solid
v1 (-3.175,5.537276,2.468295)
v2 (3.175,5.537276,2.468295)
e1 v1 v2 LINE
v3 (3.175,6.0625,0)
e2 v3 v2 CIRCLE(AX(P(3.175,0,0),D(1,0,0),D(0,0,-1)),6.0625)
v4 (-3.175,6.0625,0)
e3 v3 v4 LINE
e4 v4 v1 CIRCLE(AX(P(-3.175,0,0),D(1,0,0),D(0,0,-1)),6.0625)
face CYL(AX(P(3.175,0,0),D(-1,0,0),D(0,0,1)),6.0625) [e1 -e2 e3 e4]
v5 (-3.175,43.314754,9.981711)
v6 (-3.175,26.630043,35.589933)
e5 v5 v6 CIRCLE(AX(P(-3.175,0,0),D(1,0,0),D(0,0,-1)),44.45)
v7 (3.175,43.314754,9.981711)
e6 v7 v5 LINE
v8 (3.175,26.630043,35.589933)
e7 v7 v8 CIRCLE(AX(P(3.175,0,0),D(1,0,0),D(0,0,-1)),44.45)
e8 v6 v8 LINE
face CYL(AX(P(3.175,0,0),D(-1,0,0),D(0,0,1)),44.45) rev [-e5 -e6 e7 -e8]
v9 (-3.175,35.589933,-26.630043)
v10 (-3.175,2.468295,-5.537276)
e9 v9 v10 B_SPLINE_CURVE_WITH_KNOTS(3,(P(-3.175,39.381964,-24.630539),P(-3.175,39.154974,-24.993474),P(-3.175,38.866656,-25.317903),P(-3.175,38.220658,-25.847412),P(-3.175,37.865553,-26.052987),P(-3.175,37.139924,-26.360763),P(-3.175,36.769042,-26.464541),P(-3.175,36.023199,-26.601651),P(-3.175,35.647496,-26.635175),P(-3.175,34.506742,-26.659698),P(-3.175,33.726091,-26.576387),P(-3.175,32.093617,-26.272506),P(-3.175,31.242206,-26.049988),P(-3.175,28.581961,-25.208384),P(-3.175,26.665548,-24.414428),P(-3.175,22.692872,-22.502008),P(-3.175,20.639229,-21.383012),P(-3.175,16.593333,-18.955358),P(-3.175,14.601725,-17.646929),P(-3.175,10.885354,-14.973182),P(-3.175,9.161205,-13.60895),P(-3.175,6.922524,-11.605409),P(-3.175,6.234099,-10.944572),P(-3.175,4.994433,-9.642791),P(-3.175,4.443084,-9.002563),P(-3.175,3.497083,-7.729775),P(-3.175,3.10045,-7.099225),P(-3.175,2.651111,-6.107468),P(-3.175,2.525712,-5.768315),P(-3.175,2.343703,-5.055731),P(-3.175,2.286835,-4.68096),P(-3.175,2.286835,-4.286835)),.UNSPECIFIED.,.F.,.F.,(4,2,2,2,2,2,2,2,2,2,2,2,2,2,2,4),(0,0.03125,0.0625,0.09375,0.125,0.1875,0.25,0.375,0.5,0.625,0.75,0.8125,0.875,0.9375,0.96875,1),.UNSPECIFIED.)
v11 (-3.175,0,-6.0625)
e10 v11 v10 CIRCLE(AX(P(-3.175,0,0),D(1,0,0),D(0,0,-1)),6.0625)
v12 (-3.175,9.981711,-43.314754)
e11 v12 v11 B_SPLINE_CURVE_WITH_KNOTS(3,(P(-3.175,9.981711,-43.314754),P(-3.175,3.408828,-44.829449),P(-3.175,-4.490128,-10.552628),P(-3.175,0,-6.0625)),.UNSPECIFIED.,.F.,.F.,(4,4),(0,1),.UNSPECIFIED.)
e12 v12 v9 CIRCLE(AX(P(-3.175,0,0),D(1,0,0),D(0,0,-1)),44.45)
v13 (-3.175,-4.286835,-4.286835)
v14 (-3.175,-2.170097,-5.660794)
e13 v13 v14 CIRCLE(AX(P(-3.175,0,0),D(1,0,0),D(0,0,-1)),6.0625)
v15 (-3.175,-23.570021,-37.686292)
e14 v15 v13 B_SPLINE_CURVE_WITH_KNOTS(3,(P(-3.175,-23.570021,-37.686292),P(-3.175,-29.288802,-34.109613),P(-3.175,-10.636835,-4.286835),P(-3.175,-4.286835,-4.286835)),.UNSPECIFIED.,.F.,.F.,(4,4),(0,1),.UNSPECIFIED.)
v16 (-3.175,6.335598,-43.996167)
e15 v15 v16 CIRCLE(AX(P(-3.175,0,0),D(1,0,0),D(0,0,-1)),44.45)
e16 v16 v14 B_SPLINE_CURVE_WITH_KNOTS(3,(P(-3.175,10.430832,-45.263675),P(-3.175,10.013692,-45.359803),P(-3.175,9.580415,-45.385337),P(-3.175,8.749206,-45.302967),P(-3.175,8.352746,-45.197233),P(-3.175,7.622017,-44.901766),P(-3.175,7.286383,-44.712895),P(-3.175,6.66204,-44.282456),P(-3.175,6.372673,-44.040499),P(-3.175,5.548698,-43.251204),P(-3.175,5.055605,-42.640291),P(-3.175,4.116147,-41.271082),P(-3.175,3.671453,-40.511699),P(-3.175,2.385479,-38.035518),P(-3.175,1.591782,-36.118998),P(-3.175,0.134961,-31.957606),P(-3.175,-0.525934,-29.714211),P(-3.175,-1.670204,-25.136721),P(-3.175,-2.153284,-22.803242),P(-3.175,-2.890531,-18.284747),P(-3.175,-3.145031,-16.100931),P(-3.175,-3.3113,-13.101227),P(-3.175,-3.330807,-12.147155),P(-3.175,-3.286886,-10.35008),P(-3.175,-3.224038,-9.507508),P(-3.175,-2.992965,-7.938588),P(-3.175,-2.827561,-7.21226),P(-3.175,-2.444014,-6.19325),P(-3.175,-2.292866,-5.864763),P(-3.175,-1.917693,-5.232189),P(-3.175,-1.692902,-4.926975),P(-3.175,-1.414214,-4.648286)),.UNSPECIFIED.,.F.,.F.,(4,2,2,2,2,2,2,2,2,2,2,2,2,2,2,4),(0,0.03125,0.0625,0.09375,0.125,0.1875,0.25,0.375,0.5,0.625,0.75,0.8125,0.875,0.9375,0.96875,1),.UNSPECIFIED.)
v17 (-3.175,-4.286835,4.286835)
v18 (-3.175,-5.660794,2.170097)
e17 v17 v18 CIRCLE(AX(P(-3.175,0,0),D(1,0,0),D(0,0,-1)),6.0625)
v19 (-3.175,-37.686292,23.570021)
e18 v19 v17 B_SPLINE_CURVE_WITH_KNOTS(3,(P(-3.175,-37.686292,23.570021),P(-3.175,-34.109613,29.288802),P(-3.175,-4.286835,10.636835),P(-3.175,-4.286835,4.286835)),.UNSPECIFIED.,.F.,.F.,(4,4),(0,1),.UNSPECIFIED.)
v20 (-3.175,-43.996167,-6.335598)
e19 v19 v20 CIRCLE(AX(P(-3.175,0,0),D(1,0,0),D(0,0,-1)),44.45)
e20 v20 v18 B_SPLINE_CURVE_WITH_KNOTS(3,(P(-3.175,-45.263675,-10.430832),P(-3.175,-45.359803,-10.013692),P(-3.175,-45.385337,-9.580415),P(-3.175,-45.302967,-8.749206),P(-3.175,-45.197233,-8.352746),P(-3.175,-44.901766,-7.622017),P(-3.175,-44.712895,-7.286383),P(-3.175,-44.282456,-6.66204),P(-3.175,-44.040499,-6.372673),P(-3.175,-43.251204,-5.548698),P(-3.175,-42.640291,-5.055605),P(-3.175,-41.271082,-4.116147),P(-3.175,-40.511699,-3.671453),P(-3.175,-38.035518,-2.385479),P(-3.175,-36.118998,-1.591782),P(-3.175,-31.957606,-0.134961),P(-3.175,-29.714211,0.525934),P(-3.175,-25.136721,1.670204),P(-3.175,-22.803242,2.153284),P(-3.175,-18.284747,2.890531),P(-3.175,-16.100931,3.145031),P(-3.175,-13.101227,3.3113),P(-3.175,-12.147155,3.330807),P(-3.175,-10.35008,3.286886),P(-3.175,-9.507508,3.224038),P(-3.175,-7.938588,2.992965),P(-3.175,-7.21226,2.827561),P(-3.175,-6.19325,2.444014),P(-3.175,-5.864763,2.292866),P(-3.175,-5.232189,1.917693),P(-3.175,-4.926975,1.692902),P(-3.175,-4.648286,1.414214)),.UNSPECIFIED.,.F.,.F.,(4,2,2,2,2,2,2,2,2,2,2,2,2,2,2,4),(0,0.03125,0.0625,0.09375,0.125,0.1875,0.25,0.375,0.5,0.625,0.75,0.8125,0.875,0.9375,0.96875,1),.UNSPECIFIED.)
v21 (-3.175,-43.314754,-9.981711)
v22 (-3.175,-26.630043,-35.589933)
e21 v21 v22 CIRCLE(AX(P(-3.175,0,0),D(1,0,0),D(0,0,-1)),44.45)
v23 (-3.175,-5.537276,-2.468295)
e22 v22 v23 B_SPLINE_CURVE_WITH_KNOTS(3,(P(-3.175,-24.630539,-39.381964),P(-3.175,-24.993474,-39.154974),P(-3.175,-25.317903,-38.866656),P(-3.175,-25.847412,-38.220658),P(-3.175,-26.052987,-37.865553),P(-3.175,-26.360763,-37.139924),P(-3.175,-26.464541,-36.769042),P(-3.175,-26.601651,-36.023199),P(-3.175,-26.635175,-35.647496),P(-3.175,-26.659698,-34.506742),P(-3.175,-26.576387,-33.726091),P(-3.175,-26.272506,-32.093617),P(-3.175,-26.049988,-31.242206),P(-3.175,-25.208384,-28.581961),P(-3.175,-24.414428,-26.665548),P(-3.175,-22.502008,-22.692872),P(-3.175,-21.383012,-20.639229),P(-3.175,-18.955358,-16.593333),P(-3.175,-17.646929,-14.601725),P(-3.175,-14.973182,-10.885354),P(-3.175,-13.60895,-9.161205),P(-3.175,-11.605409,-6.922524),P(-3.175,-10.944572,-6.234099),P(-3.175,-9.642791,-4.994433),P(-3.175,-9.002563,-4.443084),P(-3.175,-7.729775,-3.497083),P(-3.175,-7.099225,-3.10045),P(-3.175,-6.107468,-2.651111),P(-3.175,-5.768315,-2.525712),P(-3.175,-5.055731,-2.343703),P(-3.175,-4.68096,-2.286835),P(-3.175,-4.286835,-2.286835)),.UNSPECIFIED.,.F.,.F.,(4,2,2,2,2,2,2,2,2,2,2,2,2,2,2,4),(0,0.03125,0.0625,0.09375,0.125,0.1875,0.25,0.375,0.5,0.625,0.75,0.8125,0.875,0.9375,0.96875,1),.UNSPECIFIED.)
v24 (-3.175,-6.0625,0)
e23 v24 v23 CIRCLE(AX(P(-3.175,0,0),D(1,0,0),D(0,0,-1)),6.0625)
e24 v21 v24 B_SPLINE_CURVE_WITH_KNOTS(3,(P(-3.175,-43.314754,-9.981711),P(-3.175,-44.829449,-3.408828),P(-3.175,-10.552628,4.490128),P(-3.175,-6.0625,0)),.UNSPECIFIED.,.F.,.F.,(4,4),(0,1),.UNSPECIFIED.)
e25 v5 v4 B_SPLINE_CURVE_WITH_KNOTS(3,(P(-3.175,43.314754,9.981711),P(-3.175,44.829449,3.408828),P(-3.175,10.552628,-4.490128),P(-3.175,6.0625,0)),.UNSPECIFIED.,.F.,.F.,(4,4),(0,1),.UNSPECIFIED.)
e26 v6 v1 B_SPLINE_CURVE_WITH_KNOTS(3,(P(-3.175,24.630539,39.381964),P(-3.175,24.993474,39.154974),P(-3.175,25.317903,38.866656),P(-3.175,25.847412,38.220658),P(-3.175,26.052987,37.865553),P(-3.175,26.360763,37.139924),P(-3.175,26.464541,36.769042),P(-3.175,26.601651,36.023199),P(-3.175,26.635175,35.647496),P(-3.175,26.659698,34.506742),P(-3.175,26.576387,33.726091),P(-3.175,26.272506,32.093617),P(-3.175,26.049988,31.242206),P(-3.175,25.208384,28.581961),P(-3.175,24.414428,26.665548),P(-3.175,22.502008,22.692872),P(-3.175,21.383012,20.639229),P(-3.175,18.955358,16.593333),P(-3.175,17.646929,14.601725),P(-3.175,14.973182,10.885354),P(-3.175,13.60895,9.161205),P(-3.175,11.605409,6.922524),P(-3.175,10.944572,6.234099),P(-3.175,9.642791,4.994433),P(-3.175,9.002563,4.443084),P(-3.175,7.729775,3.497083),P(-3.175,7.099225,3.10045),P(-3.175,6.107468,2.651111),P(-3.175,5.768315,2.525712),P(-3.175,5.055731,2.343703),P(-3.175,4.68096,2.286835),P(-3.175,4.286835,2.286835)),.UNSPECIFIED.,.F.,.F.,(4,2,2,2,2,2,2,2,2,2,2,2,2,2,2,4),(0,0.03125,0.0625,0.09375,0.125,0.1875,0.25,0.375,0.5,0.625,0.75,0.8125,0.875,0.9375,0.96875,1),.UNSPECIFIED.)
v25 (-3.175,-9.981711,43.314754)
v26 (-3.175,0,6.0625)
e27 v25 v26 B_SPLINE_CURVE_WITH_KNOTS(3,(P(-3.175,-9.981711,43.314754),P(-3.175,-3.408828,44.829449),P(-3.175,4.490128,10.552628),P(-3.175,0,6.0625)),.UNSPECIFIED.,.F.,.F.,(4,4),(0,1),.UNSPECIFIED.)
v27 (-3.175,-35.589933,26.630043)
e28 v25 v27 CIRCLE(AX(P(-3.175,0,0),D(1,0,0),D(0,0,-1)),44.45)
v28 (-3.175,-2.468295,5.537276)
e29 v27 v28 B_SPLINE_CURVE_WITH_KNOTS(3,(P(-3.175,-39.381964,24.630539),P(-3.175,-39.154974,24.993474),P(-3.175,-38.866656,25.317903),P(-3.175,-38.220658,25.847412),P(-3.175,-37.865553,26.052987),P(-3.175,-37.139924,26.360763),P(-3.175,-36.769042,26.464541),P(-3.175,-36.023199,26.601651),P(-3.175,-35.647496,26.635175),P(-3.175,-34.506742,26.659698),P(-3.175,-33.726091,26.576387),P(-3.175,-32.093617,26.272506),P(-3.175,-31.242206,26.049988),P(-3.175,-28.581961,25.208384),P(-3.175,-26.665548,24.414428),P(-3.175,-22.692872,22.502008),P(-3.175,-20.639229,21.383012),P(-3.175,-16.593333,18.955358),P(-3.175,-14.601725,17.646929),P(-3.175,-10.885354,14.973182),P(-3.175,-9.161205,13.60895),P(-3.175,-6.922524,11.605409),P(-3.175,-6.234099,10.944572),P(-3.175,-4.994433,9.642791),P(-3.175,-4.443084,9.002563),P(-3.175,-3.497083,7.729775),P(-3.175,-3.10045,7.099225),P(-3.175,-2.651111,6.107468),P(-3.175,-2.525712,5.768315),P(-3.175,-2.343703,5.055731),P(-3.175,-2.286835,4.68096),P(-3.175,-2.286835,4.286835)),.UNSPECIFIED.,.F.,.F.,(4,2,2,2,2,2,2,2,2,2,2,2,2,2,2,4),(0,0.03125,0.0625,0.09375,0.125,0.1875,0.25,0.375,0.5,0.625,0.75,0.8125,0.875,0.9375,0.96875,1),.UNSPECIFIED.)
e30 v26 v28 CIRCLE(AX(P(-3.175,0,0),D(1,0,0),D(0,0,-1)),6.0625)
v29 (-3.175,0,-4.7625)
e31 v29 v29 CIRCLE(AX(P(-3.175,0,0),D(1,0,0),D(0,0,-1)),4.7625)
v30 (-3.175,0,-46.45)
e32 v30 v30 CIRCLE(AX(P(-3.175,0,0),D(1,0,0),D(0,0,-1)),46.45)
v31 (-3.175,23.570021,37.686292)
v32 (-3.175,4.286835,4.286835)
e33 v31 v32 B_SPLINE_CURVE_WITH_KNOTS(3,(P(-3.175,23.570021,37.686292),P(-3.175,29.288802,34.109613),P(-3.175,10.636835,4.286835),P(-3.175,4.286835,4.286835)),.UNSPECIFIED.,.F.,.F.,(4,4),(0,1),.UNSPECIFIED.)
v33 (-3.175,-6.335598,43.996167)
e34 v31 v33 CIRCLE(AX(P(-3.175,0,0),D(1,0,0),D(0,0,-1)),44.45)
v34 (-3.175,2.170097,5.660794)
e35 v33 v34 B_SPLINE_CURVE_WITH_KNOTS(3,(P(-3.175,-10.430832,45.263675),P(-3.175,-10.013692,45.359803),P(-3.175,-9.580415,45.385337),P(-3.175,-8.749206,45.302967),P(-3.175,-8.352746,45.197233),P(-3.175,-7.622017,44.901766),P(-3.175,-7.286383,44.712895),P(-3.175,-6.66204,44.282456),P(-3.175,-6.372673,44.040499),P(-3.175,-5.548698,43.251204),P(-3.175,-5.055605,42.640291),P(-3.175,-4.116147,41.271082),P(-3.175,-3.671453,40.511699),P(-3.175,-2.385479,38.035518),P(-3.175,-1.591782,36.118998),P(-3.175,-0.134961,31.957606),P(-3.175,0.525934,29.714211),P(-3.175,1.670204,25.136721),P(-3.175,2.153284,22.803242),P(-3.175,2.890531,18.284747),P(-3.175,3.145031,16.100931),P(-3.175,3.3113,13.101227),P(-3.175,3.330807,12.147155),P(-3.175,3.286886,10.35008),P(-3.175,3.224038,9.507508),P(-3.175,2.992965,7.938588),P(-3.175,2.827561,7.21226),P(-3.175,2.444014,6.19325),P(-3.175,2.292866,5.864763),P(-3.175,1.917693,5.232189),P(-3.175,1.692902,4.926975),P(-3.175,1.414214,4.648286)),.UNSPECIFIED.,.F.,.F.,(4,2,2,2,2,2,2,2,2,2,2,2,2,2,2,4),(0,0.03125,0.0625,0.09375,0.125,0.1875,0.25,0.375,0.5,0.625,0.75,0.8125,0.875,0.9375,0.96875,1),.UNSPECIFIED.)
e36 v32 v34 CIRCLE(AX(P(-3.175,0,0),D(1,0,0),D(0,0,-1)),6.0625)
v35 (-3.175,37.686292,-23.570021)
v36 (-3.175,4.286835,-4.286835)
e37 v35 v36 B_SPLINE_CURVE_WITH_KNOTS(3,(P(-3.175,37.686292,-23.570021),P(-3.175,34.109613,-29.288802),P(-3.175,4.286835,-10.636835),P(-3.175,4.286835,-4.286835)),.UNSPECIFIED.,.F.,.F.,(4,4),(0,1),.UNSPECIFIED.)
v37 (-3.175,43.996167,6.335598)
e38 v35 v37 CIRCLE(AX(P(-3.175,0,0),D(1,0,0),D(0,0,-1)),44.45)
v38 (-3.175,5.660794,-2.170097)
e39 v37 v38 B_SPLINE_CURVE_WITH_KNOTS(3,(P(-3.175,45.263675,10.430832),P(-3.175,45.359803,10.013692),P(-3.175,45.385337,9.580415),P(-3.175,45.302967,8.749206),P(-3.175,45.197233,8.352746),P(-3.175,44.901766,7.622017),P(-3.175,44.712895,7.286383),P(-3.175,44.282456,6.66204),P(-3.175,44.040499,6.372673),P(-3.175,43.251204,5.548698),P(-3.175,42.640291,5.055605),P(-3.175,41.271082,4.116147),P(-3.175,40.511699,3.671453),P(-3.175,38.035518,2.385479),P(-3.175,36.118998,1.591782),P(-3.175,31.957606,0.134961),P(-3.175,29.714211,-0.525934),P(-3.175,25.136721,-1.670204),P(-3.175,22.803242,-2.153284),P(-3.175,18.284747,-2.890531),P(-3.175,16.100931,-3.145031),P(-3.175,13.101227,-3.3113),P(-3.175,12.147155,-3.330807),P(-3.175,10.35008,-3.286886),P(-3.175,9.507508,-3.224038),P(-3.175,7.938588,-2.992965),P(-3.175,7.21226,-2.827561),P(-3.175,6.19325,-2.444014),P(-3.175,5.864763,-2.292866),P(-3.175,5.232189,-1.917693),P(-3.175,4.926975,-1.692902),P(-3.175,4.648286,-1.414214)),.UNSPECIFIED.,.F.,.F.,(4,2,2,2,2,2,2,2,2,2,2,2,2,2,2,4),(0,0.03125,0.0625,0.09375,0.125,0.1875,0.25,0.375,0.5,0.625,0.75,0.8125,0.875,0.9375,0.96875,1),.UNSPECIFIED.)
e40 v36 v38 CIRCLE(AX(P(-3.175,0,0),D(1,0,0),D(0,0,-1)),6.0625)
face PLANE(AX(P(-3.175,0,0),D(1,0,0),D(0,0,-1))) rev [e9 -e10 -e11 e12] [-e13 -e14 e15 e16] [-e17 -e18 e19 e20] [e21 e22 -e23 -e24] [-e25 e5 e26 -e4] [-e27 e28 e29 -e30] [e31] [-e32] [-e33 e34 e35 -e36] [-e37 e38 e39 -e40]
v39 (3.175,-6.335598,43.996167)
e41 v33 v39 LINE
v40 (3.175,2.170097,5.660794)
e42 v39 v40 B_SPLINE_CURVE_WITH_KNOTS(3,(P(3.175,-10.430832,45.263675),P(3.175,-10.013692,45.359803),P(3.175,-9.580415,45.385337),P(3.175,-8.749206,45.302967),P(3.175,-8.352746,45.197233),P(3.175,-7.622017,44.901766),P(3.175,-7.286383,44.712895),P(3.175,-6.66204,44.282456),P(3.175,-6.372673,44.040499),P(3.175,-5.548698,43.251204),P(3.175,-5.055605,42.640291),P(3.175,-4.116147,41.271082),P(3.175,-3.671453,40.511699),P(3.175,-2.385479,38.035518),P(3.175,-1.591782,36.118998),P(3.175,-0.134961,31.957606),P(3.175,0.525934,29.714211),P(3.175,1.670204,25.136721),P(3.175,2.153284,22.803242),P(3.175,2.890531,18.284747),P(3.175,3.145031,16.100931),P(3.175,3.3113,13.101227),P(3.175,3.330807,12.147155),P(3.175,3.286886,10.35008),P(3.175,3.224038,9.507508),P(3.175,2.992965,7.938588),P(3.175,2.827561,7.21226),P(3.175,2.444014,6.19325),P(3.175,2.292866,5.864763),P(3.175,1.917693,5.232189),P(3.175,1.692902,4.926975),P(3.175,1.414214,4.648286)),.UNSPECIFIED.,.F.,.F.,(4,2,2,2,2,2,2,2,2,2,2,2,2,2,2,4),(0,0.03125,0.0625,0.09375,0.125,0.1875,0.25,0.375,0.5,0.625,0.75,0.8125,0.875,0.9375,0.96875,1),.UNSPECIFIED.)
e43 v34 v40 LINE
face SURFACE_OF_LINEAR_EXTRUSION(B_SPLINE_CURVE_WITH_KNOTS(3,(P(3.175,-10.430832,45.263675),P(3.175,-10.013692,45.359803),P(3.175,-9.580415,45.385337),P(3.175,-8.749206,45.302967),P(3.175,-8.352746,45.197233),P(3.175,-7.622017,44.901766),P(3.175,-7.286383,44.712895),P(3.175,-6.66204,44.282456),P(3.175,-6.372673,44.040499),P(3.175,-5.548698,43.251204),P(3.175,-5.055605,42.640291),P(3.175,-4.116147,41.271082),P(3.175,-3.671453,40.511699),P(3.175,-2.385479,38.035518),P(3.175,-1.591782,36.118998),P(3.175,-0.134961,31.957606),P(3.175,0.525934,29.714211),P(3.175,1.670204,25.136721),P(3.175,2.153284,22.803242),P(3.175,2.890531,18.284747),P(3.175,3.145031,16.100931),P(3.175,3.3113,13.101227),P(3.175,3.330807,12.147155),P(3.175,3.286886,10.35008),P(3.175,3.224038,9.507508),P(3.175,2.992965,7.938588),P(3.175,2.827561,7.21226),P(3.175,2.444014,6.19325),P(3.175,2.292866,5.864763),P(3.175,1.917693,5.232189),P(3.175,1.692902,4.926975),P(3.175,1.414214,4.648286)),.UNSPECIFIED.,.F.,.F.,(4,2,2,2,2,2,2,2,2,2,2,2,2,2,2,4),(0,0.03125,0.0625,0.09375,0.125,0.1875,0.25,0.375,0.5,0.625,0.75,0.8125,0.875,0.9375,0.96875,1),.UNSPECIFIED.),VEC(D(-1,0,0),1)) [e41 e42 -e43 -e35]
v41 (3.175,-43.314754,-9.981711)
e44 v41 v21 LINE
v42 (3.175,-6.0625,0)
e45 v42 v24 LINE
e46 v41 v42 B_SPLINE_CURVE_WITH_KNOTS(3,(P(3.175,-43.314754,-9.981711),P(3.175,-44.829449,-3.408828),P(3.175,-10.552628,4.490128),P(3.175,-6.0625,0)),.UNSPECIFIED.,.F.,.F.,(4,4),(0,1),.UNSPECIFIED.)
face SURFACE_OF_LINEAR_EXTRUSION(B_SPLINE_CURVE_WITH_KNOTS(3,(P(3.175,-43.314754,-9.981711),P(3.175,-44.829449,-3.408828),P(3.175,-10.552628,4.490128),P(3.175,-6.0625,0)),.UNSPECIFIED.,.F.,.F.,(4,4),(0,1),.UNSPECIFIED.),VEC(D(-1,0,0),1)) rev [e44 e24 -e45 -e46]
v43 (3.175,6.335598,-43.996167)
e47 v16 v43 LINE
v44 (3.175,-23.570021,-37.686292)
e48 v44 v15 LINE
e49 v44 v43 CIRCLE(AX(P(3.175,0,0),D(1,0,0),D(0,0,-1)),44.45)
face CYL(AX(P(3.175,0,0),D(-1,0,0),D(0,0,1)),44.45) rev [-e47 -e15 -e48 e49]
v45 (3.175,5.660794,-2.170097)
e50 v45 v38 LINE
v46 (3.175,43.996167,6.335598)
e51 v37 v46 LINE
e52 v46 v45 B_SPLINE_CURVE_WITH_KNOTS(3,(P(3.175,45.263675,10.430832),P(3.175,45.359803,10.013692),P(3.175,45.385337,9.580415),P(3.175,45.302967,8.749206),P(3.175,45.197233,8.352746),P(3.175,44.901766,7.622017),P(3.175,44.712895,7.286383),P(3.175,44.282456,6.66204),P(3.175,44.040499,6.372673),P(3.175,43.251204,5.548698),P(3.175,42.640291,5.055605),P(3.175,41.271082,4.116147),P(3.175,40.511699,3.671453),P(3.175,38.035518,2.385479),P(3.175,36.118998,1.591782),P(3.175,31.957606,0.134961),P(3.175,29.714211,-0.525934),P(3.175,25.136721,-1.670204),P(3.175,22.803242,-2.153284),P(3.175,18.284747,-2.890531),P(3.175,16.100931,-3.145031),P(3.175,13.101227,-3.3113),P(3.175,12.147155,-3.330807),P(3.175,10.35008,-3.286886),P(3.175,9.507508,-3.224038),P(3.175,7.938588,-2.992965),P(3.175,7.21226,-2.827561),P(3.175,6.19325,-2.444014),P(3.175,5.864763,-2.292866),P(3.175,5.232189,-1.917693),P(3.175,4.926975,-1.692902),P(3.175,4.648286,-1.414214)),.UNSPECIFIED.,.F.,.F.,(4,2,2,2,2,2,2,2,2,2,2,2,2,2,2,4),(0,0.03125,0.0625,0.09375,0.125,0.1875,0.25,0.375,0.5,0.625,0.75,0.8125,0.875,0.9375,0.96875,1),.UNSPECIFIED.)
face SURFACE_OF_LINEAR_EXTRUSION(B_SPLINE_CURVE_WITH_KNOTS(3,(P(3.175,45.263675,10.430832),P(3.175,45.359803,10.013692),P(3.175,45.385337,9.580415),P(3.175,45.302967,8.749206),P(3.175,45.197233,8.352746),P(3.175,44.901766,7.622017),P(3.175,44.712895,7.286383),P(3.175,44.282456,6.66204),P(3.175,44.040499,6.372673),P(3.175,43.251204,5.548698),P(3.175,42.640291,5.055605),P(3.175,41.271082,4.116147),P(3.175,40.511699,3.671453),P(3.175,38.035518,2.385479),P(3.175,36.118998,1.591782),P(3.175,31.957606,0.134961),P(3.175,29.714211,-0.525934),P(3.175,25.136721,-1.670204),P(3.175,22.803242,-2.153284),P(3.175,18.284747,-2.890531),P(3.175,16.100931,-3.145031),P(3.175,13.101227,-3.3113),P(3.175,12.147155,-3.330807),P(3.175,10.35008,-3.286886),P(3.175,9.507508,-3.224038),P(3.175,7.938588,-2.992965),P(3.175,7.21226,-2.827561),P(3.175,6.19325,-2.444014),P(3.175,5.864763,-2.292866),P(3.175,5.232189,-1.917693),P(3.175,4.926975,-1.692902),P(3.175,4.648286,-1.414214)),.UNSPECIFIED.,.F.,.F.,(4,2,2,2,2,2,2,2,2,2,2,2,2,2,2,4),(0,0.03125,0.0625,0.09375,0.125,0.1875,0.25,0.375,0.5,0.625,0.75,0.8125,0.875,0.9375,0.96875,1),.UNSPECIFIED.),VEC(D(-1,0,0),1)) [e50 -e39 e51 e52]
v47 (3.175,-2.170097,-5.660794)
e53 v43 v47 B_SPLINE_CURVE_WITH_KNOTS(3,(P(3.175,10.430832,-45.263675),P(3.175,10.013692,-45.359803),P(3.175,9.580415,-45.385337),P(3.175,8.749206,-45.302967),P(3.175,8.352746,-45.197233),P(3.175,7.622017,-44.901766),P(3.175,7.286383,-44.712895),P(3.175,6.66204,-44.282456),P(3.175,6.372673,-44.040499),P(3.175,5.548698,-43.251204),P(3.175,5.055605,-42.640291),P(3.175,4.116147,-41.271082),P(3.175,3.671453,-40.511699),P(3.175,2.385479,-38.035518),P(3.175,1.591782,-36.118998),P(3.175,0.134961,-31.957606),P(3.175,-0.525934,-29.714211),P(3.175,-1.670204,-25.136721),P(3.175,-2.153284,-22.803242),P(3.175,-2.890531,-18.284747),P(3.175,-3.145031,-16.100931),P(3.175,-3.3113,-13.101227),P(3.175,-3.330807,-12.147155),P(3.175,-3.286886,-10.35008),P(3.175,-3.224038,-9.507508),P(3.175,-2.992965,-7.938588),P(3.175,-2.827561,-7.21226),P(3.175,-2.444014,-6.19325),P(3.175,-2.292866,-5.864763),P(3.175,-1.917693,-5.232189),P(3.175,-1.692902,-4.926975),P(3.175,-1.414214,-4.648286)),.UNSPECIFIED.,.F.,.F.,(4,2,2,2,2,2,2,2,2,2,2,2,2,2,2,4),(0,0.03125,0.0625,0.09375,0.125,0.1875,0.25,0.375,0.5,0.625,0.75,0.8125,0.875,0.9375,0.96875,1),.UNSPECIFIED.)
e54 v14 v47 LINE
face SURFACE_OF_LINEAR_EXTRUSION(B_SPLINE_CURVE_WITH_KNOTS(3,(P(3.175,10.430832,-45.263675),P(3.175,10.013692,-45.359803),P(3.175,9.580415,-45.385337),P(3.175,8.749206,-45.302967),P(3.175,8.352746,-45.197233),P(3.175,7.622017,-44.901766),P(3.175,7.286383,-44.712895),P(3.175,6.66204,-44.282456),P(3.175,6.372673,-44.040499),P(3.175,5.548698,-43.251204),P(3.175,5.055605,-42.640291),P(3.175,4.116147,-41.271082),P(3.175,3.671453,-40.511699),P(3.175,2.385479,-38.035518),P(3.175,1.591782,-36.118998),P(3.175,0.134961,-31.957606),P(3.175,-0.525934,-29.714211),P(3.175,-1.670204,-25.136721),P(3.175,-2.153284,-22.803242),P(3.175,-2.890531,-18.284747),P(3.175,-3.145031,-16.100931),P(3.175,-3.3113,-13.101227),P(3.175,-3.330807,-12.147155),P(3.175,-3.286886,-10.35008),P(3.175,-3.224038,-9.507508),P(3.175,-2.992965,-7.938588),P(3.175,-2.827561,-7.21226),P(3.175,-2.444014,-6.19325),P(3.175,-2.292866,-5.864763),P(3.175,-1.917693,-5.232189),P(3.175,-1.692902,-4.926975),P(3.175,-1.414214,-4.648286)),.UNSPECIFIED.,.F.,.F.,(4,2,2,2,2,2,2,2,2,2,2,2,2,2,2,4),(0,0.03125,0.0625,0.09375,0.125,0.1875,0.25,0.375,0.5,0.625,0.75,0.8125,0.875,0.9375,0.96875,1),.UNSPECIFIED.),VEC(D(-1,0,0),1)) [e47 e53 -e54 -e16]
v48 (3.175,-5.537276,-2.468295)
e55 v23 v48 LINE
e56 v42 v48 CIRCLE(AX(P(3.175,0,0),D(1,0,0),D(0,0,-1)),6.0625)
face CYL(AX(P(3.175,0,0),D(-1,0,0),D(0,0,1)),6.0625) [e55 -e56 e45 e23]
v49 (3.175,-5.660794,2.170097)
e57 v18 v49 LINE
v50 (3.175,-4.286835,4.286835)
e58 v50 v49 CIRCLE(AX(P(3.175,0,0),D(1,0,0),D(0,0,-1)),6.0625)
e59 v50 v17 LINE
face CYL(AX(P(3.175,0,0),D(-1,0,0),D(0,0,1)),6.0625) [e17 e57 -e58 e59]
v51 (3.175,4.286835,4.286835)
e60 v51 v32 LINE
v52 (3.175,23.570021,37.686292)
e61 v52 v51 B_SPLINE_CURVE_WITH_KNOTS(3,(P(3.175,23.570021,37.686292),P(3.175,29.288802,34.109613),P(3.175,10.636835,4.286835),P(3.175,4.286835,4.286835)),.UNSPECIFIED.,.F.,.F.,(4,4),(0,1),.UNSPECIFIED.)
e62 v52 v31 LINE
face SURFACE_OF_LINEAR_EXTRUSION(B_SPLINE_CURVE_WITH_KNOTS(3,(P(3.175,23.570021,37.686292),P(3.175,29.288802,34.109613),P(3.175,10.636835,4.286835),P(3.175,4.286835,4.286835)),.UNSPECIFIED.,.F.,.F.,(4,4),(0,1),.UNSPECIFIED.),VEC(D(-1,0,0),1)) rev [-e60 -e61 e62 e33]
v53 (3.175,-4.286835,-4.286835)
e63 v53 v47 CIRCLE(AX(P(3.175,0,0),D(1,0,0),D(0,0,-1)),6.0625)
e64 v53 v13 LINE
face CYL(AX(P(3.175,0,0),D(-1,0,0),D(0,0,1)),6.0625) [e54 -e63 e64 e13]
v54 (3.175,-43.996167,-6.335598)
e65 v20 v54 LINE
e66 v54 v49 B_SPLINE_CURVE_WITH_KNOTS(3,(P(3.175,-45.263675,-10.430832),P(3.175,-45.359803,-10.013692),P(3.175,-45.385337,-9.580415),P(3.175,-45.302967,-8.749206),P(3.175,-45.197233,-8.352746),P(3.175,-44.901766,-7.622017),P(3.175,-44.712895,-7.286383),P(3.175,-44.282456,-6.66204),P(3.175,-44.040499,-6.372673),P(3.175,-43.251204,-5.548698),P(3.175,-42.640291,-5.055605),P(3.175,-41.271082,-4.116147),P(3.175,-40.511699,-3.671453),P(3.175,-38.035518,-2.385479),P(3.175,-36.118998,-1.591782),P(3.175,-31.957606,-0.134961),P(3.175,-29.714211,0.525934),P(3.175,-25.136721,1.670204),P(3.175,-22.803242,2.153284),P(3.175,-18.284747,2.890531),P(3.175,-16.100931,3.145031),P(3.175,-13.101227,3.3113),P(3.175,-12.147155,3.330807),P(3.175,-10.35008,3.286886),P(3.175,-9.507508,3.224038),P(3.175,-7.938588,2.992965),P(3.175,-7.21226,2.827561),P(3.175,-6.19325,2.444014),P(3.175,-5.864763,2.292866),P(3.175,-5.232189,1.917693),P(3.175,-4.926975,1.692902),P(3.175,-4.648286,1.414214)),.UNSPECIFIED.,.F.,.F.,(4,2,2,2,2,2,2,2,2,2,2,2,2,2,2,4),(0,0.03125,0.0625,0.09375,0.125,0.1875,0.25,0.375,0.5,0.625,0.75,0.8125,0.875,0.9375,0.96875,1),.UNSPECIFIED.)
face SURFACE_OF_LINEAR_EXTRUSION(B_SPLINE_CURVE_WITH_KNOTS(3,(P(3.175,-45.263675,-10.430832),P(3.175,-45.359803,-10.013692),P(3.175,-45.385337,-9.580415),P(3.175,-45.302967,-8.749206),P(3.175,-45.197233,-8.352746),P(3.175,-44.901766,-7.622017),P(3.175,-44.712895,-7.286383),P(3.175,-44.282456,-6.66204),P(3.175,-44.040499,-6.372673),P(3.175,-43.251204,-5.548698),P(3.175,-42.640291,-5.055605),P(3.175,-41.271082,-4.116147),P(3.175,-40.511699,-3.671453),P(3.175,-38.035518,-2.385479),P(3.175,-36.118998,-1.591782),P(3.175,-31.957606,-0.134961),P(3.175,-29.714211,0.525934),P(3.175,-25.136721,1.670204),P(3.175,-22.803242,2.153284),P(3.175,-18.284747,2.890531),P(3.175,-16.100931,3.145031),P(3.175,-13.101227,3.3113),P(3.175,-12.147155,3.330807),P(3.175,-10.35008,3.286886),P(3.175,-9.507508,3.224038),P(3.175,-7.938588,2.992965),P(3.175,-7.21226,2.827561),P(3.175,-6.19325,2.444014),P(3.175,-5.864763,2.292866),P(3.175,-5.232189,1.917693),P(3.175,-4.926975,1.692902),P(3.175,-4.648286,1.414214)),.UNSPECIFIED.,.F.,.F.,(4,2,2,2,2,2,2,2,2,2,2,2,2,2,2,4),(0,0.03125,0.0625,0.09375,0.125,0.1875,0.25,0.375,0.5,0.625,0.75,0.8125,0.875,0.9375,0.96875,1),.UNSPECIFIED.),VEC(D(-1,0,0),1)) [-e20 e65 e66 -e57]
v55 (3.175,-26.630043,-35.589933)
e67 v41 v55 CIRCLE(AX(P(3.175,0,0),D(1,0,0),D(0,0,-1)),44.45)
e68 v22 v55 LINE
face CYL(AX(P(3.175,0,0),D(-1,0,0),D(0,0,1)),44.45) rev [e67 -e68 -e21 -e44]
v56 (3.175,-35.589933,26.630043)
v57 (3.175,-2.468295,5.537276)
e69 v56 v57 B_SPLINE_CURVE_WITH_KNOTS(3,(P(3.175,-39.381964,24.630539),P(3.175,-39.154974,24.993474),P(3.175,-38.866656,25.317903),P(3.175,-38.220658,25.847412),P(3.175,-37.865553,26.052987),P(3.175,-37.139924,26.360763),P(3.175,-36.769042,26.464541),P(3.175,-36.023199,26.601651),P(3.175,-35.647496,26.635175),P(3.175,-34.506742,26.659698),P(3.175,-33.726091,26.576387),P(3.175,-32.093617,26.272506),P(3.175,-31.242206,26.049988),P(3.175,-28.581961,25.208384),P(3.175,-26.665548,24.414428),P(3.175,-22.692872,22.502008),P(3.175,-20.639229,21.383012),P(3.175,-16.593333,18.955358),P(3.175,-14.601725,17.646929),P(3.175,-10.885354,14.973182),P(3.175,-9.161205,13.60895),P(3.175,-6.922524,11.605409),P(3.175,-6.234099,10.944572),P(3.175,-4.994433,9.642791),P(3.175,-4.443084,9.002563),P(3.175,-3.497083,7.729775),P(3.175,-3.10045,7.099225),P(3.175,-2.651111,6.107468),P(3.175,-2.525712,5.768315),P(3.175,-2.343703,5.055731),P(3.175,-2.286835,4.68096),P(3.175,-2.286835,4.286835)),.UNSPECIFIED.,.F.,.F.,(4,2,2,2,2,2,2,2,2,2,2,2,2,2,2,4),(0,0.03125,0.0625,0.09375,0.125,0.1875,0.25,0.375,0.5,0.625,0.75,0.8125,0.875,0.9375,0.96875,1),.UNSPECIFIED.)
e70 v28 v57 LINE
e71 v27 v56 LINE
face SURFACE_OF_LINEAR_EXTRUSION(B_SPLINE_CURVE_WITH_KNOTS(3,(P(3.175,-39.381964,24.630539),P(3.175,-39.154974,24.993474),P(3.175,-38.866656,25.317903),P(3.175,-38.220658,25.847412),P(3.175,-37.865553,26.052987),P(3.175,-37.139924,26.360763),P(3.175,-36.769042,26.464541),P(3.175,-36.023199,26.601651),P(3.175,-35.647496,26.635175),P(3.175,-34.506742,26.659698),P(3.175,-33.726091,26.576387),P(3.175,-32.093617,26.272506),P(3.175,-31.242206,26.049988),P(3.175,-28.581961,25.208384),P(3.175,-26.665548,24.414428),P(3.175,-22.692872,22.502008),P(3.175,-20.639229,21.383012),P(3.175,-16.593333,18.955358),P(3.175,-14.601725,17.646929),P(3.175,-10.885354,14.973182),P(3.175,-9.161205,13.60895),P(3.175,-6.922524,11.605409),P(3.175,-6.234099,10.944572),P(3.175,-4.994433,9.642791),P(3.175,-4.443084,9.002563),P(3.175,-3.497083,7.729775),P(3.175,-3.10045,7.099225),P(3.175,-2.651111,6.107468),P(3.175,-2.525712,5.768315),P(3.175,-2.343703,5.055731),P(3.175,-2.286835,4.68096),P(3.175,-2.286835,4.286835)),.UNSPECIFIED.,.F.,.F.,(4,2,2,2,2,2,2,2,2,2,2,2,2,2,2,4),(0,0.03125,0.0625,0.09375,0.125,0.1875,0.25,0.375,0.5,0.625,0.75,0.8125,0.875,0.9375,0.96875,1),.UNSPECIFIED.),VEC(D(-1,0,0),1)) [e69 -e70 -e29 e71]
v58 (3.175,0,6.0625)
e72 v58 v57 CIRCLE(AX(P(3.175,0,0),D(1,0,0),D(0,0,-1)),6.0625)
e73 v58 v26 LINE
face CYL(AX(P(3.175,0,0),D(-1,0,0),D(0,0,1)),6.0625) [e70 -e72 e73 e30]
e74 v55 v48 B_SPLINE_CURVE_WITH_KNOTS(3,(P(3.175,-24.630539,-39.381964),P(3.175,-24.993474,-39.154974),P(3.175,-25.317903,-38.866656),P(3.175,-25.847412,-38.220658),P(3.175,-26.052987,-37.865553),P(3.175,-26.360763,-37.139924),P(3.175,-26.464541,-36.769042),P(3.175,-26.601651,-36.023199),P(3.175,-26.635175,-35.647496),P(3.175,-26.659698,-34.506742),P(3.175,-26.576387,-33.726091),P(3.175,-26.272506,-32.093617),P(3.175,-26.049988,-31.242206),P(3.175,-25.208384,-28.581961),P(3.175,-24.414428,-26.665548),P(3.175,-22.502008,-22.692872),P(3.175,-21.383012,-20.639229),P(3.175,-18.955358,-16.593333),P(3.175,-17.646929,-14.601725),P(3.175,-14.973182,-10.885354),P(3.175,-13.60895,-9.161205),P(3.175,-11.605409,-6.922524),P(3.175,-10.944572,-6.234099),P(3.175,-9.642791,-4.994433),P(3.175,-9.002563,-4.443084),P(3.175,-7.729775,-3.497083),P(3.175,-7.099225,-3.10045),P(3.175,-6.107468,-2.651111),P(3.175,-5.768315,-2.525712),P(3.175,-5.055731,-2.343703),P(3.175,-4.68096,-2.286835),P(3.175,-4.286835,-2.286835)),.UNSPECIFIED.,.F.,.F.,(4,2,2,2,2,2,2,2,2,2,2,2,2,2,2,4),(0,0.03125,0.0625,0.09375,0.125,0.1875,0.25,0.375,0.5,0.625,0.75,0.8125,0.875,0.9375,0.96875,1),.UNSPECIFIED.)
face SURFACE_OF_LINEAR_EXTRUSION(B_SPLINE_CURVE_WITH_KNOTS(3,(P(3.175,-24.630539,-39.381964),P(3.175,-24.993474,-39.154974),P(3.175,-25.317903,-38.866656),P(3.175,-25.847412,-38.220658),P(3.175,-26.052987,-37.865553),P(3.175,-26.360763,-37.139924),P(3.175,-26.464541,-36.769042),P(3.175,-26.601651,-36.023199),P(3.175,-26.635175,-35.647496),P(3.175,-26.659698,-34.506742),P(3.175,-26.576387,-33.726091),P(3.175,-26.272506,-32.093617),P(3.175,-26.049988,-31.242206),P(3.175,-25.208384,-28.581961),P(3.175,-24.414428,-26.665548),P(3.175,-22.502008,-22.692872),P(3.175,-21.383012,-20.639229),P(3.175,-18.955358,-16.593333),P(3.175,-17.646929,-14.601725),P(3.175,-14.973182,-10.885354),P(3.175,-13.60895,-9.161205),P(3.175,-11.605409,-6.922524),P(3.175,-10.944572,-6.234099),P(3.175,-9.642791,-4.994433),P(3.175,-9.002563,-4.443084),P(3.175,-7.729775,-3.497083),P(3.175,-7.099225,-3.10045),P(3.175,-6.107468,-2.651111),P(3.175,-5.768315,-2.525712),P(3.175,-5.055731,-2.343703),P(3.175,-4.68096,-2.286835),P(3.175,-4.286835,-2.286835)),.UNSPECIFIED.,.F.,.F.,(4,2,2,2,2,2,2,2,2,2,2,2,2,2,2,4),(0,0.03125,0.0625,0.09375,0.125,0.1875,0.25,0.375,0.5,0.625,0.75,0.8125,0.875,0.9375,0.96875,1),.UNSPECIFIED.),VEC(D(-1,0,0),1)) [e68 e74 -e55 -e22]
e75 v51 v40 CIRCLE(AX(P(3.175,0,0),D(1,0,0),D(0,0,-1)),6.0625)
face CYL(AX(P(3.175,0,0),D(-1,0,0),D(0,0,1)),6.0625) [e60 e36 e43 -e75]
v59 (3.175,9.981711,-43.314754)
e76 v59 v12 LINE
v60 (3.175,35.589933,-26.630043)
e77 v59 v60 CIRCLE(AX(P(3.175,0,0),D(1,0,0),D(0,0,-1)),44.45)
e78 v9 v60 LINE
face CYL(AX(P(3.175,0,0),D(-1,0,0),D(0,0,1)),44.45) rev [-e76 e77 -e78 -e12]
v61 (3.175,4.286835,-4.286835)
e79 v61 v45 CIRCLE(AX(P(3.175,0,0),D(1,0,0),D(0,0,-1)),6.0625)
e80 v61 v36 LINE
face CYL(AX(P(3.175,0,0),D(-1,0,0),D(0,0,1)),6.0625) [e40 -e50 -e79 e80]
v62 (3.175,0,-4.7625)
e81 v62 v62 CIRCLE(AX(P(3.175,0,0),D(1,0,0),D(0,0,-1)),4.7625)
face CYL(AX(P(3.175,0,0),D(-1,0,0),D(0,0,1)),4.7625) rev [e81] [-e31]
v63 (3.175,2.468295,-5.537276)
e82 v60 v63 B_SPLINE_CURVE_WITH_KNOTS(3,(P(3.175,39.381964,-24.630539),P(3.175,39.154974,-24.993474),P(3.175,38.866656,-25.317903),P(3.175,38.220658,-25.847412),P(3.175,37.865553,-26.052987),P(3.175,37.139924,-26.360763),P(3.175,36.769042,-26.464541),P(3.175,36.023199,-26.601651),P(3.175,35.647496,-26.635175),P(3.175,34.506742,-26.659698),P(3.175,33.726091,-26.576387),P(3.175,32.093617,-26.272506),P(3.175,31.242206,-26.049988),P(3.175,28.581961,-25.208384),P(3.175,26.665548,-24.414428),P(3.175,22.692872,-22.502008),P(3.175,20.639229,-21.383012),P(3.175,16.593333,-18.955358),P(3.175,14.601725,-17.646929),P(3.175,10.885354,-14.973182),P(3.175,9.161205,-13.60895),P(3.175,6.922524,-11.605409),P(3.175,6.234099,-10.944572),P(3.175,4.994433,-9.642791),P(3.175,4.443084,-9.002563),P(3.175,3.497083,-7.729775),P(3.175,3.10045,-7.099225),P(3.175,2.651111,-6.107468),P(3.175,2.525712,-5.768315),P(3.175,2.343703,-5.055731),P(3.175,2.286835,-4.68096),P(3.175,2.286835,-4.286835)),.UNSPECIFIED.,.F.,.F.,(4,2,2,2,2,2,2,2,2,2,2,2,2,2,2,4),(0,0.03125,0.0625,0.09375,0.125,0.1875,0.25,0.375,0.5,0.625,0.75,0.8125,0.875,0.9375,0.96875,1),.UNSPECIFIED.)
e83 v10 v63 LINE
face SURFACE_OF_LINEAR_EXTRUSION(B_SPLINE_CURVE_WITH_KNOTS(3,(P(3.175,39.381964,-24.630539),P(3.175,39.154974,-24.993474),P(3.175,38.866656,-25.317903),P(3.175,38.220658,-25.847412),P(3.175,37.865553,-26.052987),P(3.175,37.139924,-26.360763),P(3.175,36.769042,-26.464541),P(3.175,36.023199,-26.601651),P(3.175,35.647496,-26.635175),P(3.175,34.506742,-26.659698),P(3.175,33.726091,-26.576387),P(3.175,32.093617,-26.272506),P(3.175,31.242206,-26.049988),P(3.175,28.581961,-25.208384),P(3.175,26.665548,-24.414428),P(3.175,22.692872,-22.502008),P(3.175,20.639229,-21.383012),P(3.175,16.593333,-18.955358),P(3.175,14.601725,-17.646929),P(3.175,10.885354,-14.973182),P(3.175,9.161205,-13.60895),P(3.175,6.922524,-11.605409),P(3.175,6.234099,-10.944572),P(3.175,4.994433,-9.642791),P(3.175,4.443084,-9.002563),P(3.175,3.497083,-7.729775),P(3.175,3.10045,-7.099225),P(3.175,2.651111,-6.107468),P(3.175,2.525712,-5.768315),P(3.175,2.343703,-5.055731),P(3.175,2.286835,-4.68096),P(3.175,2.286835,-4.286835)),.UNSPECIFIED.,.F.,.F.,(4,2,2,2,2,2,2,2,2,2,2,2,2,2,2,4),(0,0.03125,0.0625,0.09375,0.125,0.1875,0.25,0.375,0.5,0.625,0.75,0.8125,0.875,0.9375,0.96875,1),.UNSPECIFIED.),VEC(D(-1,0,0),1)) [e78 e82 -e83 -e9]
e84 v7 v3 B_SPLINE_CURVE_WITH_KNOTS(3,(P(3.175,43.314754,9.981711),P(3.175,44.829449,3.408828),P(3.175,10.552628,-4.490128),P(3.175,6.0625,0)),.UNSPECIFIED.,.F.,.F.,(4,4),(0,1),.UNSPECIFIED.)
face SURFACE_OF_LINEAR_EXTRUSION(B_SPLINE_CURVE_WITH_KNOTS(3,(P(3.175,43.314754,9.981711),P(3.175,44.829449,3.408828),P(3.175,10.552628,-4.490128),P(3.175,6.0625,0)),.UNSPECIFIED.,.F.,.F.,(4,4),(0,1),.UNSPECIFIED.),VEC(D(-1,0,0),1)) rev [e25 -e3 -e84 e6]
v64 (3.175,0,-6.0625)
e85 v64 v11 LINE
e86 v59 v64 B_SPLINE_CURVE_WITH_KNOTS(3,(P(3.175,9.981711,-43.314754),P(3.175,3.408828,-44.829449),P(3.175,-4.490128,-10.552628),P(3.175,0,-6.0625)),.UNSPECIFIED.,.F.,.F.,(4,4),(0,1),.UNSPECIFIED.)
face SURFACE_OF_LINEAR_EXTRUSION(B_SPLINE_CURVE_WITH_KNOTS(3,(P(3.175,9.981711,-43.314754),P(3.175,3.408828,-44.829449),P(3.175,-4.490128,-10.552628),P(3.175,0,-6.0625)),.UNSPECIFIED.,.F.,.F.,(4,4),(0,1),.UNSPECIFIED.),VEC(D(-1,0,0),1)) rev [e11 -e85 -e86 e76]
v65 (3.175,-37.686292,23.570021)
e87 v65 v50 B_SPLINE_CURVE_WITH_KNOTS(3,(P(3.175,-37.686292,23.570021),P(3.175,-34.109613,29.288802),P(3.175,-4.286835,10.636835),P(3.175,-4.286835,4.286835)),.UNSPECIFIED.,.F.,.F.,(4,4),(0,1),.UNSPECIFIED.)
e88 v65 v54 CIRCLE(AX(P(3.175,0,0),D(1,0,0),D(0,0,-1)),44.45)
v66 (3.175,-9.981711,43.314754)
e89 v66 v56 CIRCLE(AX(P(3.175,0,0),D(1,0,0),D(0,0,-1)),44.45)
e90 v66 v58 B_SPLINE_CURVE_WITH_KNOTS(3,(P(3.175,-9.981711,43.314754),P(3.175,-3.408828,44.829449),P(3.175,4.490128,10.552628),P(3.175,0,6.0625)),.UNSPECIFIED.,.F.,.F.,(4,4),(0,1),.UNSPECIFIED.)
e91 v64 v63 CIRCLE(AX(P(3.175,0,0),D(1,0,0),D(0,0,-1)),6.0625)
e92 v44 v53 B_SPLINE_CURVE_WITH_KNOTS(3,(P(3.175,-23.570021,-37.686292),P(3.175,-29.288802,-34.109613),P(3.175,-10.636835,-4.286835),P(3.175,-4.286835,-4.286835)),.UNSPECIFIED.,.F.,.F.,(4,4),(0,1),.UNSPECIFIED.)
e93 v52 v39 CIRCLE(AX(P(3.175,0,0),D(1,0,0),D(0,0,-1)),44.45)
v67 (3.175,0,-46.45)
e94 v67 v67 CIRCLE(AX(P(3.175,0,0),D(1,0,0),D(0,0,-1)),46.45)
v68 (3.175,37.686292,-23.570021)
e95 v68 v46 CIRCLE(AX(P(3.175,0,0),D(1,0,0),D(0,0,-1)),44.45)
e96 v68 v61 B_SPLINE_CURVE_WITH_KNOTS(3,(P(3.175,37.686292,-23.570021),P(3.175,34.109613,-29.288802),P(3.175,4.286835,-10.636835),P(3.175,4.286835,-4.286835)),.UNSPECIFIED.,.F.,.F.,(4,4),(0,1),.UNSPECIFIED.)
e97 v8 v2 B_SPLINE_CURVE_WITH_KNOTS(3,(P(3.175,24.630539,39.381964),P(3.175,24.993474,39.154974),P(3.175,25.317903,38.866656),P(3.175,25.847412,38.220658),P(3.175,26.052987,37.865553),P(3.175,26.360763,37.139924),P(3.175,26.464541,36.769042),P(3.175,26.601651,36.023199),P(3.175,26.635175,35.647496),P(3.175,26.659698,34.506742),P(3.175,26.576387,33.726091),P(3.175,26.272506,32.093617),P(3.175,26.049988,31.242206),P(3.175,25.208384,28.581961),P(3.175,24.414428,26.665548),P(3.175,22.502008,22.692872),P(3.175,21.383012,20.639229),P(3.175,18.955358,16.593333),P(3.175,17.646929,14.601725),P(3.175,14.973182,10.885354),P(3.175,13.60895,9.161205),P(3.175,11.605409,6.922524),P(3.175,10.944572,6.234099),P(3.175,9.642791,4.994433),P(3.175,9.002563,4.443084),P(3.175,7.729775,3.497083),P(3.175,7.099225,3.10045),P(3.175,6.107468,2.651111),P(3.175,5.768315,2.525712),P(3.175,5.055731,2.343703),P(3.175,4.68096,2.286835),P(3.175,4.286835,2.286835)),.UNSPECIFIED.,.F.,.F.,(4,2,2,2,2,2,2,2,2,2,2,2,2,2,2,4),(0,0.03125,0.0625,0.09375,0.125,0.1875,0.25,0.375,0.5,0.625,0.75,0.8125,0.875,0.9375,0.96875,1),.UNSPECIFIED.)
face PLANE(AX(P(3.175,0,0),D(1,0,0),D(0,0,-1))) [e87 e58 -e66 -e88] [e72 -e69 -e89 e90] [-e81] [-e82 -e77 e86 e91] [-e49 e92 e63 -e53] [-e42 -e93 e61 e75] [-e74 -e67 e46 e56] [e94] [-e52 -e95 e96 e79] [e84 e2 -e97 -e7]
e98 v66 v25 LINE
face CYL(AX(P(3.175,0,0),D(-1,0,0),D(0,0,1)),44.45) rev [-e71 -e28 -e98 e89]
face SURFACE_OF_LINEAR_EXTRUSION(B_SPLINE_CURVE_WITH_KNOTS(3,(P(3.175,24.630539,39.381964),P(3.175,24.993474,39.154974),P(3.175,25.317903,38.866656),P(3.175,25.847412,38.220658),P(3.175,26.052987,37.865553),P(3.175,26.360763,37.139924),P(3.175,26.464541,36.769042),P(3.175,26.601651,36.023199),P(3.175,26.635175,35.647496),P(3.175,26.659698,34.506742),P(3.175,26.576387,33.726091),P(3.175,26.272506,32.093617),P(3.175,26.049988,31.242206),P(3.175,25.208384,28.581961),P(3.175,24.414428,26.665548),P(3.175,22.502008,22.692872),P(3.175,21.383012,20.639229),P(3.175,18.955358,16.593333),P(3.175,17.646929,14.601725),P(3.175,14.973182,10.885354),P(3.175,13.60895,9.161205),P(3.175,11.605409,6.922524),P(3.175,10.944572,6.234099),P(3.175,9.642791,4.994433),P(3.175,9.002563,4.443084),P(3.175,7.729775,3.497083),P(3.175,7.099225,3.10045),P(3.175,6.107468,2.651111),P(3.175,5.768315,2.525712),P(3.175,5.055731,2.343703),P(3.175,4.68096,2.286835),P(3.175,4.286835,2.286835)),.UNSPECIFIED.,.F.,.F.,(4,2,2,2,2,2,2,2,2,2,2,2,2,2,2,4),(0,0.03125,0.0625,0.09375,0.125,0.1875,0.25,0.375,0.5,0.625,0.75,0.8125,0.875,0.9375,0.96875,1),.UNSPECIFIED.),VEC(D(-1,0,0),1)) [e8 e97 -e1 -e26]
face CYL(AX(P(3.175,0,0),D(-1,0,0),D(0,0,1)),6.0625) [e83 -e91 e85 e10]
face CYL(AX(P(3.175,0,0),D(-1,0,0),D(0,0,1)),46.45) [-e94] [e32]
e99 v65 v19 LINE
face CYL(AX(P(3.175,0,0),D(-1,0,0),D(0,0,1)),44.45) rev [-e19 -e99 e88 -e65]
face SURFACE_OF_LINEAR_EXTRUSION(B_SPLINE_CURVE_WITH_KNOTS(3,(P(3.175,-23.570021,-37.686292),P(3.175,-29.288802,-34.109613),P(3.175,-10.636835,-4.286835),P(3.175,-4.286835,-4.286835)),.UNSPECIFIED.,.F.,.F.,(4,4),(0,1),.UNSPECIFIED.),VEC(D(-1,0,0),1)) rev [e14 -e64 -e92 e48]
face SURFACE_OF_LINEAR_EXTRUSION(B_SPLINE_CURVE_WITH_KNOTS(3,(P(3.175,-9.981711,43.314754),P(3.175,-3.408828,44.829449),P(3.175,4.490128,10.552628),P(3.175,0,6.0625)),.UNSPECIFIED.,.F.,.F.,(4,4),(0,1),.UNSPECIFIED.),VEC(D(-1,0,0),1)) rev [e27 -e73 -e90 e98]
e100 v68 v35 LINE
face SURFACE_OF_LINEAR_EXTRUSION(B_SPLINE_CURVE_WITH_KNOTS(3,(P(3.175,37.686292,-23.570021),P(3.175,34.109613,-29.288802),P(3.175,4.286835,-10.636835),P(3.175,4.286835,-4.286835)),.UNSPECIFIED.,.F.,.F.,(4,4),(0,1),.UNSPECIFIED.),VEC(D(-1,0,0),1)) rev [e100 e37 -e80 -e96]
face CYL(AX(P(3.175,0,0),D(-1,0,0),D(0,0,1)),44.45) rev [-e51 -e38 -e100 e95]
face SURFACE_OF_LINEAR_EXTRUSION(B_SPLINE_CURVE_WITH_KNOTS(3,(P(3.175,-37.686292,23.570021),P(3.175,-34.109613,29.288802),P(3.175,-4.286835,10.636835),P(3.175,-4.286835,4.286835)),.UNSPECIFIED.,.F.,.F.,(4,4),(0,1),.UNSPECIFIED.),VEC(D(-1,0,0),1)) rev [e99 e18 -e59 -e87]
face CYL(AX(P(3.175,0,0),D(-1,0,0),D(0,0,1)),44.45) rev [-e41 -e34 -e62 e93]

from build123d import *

# Parameters (mm, degrees)
SKETCH1_R             = 6.0625
SKETCH1_R_2           = 4.7625
BOSS_EXTRUDE1_DEPTH   = 3.175
SKETCH1_R_3           = 46.45
SKETCH1_R_4           = 44.45
BOSS_EXTRUDE1_2_DEPTH = 3.175
EXTRUDE_THIN2_START   = -3.175
EXTRUDE_THIN2_DEPTH   = 6.35
CIRPATTERN1_COUNT     = 8


# Read off the part's stored shape, not the designer's step: Extrude-Thin2
with BuildPart() as part:
    # Sketch1 → Boss-Extrude1 (new, symmetric)
    with BuildSketch(Plane(origin=(0, 0, 0), x_dir=(0, 0, -1), z_dir=(1, 0, 0))):
        Circle(SKETCH1_R)
        Circle(SKETCH1_R_2, mode=Mode.SUBTRACT)
    extrude(amount=BOSS_EXTRUDE1_DEPTH, both=True)



with BuildPart() as body_2:
    # Sketch1 → Boss-Extrude1 2 (new, symmetric)
    with BuildSketch(Plane(origin=(0, 0, 0), x_dir=(0, 0, -1), z_dir=(1, 0, 0))):
        Circle(SKETCH1_R_3)
        Circle(SKETCH1_R_4, mode=Mode.SUBTRACT)
    extrude(amount=BOSS_EXTRUDE1_2_DEPTH, both=True)


with BuildPart() as part_1:
    add(part.part)

    add(body_2.part)  # Extrude-Thin2 merges body 2
    # Extrude-Thin2 outline → Extrude-Thin2 (add)
    with BuildSketch(Plane(origin=(0, 0, 0), x_dir=(0, 0, -1), z_dir=(1, 0, 0)).offset(EXTRUDE_THIN2_START)):
        with BuildLine():
            add(Edge.make_bspline(
                [(-6.3355985, 43.996166784), (-6.255095923, 43.925032839), (-6.175963075, 43.852068198), (-5.548698351, 43.251204224), (-5.055604829, 42.640291134), (-4.116147204, 41.27108179), (-3.6714525, 40.51169877), (-2.385479272, 38.035518018), (-1.591781782, 36.118997617), (-0.134960901, 31.957605755), (0.525933851, 29.714211022), (1.670203871, 25.136721013), (2.153284246, 22.803242272), (2.890531028, 18.2847466), (3.145030649, 16.100931227), (3.311299949, 13.10122741), (3.330807031, 12.147155076), (3.286885537, 10.350080052), (3.224038366, 9.507507634), (2.992965499, 7.938587571), (2.827561189, 7.21225965), (2.459079192, 6.233276095), (2.328164202, 5.942334081), (2.170097204, 5.660793617)],
                knots=[0.116131233, 0.116131233, 0.116131233, 0.116131233, 0.125, 0.125, 0.1875, 0.1875, 0.25, 0.25, 0.375, 0.375, 0.5, 0.5, 0.625, 0.625, 0.75, 0.75, 0.8125, 0.8125, 0.875, 0.875, 0.9375, 0.9375, 0.965067589, 0.965067589, 0.965067589, 0.965067589], degree=3))
            ThreePointArc((-6.3355985, 43.996166784), (-8.165765838, 43.693509453), (-9.981711445, 43.31475426))
            add(Edge.make_bspline(
                [(-9.981711445, 43.31475426), (-3.408827872, 44.829448925), (4.490128061, 10.552628061), (0, 6.0625)],
                knots=[0, 0, 0, 0, 1, 1, 1, 1], degree=3))
            ThreePointArc((0, 6.0625), (1.103481977, 5.961227539), (2.170097204, 5.660793617))
        make_face()
    extrude_thin2 = extrude(amount=EXTRUDE_THIN2_DEPTH)

    # CirPattern1: Extrude-Thin2 ×8 about axis
    cirpattern1_axis = Axis((56.075510447, 0, 0), (-1, 0, 0))
    for i in range(1, CIRPATTERN1_COUNT):
        add(extrude_thin2.rotate(cirpattern1_axis, i * 360 / CIRPATTERN1_COUNT))


solid = part_1.part
